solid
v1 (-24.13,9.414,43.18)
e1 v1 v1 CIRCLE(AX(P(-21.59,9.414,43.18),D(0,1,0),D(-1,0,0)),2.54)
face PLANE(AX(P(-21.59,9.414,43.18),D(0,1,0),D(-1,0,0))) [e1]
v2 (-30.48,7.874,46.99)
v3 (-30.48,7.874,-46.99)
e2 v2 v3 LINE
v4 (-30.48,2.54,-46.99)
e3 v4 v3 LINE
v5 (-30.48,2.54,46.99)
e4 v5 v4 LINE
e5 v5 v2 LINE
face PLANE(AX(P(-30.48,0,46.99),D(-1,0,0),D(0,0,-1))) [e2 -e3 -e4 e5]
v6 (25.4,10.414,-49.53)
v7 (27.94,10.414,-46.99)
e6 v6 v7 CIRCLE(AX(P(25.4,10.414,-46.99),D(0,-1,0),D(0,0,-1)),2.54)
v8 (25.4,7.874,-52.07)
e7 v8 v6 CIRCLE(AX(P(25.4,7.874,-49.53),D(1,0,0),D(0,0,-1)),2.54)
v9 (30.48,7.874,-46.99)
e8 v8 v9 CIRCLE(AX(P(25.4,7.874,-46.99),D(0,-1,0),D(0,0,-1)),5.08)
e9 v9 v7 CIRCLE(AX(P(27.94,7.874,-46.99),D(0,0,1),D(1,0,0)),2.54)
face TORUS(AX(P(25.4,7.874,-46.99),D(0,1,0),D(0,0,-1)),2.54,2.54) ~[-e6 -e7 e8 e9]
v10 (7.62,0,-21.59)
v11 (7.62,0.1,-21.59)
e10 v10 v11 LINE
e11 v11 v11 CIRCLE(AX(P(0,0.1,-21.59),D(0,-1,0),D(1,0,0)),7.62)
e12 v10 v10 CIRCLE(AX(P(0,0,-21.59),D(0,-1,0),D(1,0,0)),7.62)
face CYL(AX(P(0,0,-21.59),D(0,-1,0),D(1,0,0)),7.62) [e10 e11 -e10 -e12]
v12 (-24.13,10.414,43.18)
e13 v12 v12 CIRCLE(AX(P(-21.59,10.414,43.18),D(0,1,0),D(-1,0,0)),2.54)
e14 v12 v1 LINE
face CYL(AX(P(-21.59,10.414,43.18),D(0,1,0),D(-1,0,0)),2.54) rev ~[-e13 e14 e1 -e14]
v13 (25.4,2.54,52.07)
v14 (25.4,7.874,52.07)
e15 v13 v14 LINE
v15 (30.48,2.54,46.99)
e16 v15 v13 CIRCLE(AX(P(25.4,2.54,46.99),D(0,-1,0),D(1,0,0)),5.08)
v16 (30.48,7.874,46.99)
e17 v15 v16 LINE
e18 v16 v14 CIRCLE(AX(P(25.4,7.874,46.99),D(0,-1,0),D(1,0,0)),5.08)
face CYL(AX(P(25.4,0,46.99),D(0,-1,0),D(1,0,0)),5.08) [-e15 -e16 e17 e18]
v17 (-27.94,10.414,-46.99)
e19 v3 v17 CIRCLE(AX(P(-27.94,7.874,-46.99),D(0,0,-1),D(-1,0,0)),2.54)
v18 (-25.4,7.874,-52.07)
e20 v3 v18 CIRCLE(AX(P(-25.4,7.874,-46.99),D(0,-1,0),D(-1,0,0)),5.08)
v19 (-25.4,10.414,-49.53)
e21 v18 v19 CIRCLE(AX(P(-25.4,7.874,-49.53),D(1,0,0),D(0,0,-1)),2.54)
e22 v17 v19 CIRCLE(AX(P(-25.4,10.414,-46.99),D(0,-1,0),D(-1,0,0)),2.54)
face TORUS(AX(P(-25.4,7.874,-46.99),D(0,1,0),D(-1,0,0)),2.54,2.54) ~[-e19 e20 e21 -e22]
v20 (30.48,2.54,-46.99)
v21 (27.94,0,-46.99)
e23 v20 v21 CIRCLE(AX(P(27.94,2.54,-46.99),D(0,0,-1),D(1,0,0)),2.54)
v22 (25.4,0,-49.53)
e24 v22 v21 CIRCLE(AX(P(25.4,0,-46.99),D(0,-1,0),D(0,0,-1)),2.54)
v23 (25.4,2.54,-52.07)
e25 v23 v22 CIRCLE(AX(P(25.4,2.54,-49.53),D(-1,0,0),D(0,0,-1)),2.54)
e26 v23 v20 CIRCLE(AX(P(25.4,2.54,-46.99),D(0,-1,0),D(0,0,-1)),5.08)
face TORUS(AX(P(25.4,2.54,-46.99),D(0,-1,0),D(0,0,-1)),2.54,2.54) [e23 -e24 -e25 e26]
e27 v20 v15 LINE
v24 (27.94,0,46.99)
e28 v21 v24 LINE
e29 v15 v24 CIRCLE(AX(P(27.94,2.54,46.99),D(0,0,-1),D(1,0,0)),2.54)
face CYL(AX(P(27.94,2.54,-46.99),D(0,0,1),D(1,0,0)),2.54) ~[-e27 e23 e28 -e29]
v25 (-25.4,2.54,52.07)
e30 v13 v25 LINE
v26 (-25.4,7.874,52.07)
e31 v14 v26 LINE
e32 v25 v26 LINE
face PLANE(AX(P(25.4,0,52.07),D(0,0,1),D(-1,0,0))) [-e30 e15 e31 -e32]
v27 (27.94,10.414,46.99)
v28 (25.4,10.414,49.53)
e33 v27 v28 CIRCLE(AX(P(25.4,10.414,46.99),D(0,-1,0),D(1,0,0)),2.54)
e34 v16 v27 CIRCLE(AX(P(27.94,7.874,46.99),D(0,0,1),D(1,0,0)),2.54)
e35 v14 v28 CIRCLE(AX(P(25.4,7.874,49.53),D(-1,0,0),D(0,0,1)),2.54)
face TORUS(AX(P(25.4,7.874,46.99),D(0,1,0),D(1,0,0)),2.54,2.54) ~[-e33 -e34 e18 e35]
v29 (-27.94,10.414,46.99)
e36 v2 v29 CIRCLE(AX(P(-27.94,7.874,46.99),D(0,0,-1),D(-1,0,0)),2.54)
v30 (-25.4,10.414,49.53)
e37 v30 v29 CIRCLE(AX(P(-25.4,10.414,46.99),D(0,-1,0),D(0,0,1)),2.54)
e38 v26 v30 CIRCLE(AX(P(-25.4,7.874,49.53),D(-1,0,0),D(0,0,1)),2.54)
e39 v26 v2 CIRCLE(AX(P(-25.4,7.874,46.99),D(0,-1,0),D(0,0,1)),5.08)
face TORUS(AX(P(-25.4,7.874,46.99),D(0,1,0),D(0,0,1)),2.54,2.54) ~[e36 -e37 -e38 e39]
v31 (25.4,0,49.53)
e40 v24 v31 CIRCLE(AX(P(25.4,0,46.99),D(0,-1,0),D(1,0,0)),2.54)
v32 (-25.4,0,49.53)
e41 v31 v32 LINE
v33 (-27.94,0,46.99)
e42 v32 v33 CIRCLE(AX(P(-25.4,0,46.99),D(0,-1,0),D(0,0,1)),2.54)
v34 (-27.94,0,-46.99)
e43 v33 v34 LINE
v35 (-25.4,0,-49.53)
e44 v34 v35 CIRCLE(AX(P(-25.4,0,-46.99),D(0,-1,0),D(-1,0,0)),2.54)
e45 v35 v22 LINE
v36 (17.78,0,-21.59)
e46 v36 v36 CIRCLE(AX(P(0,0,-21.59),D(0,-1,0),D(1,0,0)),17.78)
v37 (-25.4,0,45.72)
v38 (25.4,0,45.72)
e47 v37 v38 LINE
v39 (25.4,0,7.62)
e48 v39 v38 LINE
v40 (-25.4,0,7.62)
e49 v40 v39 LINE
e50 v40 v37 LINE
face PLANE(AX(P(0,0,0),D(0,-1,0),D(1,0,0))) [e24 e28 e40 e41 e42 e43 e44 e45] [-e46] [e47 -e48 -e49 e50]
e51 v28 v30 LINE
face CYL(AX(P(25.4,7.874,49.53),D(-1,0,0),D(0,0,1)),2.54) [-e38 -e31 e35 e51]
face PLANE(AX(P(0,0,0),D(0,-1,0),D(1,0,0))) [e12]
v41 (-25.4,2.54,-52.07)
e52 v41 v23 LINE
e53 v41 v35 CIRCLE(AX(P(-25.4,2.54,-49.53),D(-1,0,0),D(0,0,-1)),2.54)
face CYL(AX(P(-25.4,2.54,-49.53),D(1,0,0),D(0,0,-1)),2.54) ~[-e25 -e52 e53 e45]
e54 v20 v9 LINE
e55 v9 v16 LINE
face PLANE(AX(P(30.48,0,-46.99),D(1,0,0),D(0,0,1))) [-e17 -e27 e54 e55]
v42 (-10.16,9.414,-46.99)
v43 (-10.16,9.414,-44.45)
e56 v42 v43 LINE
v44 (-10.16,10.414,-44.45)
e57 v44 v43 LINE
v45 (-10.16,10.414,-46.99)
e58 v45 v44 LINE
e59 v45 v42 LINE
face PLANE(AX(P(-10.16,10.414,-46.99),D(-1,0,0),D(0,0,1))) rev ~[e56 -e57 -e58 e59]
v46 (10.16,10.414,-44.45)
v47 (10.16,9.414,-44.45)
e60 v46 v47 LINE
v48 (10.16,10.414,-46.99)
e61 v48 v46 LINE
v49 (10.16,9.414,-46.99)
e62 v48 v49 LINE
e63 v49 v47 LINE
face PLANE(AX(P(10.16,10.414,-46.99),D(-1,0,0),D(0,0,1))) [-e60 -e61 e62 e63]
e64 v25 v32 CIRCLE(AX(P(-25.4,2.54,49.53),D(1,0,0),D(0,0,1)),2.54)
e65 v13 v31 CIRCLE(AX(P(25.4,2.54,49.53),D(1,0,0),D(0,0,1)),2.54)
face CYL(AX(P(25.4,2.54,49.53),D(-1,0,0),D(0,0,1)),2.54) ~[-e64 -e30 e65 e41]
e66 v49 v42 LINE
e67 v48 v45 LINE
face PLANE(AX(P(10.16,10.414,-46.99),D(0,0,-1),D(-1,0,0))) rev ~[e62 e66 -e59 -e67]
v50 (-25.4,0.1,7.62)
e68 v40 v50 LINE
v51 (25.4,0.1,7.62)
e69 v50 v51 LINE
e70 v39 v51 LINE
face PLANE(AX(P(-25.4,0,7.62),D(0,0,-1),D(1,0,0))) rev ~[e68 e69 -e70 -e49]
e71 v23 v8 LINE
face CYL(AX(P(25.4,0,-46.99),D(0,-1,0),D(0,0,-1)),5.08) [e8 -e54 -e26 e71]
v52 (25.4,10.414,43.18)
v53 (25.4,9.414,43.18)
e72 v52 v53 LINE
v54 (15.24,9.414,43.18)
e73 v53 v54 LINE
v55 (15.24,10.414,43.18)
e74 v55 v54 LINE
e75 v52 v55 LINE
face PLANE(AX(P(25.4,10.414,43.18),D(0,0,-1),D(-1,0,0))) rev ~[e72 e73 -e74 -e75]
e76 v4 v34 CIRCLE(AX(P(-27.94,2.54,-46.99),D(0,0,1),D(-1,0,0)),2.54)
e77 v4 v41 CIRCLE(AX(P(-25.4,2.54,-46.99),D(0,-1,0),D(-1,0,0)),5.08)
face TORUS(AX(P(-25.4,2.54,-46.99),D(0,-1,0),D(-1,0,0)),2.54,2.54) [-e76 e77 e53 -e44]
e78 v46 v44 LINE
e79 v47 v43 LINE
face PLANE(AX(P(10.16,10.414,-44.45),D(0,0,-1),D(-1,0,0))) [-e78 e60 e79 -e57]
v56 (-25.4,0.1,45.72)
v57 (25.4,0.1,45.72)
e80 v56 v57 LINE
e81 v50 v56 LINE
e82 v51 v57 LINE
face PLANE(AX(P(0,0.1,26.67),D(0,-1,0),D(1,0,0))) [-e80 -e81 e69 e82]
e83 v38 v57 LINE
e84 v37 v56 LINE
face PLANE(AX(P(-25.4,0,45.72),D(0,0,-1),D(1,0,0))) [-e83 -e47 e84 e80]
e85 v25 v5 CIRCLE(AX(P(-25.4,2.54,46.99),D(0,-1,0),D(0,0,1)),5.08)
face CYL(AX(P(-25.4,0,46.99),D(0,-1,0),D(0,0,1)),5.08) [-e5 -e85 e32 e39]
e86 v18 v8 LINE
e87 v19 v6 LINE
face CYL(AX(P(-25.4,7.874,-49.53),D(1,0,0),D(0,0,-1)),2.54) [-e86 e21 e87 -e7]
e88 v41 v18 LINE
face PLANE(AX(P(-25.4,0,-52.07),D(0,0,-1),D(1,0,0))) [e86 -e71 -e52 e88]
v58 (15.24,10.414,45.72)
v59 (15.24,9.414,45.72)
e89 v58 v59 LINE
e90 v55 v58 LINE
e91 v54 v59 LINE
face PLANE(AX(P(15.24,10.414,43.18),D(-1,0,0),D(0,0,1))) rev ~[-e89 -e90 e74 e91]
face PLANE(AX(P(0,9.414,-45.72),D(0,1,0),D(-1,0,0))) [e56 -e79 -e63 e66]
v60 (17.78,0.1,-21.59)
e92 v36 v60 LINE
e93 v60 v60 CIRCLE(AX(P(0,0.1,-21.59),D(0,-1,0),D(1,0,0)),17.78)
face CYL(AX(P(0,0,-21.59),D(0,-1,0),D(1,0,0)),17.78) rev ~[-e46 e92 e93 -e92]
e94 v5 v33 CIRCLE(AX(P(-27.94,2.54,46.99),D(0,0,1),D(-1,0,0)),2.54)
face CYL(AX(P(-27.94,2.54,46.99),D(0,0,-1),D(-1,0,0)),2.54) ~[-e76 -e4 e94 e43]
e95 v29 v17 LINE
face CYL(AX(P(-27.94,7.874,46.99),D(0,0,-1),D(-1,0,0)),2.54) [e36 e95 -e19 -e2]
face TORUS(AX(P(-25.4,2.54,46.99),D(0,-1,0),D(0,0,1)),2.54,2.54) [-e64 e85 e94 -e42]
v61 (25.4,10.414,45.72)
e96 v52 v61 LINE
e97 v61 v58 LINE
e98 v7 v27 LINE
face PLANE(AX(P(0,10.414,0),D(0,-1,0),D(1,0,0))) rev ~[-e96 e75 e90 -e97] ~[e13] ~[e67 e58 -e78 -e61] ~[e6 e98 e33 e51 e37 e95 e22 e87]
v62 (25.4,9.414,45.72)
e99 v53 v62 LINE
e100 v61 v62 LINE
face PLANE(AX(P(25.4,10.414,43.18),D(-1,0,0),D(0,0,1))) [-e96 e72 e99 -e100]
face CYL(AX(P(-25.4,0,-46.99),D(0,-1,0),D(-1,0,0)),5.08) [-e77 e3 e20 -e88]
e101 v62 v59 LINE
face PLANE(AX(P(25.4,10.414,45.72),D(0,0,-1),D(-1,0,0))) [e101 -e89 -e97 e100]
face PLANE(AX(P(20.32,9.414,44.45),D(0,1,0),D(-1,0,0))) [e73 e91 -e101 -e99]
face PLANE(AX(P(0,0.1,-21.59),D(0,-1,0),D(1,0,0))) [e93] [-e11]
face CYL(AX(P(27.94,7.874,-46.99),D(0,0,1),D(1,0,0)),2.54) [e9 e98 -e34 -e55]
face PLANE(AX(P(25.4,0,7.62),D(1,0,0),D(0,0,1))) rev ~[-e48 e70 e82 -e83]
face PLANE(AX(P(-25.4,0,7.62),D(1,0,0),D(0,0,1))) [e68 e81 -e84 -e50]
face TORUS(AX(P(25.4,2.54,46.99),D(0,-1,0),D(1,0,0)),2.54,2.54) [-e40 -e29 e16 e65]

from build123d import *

# Parameters (mm, degrees)
F0_R     = 17.78
F0_W     = 50.8
F0_H     = 38.1
F0_R_2   = 7.62
F1_DEPTH = 10.414
F2_DEPTH = 0.1
F3_W     = 10.16
F3_H     = 2.54
F3_R     = 2.54
F3_W_2   = 20.32
F4_DEPTH = 1
F5_R     = 2.54


with BuildPart() as f1:
    # F0 (on Front) → F1 (new body)
    with BuildSketch(Plane.XZ):
        with BuildLine():
            ThreePointArc((30.48, 46.99), (28.9921024484, 50.5821024484), (25.4, 52.07))
            Line((25.4, 52.07), (-25.4, 52.07))
            ThreePointArc((-25.4, 52.07), (-28.9921024484, 50.5821024484), (-30.48, 46.99))
            Line((-30.48, 46.99), (-30.48, -46.99))
            ThreePointArc((-30.48, -46.99), (-28.9921024484, -50.5821024484), (-25.4, -52.07))
            Line((-25.4, -52.07), (25.4, -52.07))
            ThreePointArc((25.4, -52.07), (28.9921024484, -50.5821024484), (30.48, -46.99))
            Line((30.48, -46.99), (30.48, 46.99))
        make_face()
        with Locations((0, -21.59)):
            Circle(F0_R, mode=Mode.SUBTRACT)
        with Locations((0, 26.67)):
            Rectangle(F0_W, F0_H, mode=Mode.SUBTRACT)
        with Locations((0, 26.67)):
            Rectangle(F0_W, F0_H)
        with Locations((0, -21.59)):
            Circle(F0_R)
        with Locations((0, -21.59)):
            Circle(F0_R_2, mode=Mode.SUBTRACT)
        with Locations((0, -21.59)):
            Circle(F0_R_2)
    extrude(amount=-F1_DEPTH)

    # F0 (on Front) → F2 (cut)
    with BuildSketch(Plane.XZ):
        with Locations((0, 26.67)):
            Rectangle(F0_W, F0_H)
        with Locations((0, -21.59)):
            Circle(F0_R)
        with Locations((0, -21.59)):
            Circle(F0_R_2, mode=Mode.SUBTRACT)
    extrude(amount=-F2_DEPTH, mode=Mode.SUBTRACT)

    # F3 (on face) → F4 (cut)
    with BuildSketch(Plane(origin=(0, 10.414, 0), x_dir=(-1, 0, 0), z_dir=(0, 1, 0))):
        with Locations((-20.32, 44.45)):
            Rectangle(F3_W, F3_H)
        with Locations((21.59, 43.18)):
            Circle(F3_R)
        with Locations((0, -45.72)):
            Rectangle(F3_W_2, F3_H)
    extrude(amount=-F4_DEPTH, mode=Mode.SUBTRACT)

    # F5
    f5_edges = [f1.edges().sort_by_distance(p)[0] for p in [
        (30.48, 0, 0),
        (30.48, 10.414, 0),
    ]]
    fillet(f5_edges, radius=F5_R)


solid = f1.part
